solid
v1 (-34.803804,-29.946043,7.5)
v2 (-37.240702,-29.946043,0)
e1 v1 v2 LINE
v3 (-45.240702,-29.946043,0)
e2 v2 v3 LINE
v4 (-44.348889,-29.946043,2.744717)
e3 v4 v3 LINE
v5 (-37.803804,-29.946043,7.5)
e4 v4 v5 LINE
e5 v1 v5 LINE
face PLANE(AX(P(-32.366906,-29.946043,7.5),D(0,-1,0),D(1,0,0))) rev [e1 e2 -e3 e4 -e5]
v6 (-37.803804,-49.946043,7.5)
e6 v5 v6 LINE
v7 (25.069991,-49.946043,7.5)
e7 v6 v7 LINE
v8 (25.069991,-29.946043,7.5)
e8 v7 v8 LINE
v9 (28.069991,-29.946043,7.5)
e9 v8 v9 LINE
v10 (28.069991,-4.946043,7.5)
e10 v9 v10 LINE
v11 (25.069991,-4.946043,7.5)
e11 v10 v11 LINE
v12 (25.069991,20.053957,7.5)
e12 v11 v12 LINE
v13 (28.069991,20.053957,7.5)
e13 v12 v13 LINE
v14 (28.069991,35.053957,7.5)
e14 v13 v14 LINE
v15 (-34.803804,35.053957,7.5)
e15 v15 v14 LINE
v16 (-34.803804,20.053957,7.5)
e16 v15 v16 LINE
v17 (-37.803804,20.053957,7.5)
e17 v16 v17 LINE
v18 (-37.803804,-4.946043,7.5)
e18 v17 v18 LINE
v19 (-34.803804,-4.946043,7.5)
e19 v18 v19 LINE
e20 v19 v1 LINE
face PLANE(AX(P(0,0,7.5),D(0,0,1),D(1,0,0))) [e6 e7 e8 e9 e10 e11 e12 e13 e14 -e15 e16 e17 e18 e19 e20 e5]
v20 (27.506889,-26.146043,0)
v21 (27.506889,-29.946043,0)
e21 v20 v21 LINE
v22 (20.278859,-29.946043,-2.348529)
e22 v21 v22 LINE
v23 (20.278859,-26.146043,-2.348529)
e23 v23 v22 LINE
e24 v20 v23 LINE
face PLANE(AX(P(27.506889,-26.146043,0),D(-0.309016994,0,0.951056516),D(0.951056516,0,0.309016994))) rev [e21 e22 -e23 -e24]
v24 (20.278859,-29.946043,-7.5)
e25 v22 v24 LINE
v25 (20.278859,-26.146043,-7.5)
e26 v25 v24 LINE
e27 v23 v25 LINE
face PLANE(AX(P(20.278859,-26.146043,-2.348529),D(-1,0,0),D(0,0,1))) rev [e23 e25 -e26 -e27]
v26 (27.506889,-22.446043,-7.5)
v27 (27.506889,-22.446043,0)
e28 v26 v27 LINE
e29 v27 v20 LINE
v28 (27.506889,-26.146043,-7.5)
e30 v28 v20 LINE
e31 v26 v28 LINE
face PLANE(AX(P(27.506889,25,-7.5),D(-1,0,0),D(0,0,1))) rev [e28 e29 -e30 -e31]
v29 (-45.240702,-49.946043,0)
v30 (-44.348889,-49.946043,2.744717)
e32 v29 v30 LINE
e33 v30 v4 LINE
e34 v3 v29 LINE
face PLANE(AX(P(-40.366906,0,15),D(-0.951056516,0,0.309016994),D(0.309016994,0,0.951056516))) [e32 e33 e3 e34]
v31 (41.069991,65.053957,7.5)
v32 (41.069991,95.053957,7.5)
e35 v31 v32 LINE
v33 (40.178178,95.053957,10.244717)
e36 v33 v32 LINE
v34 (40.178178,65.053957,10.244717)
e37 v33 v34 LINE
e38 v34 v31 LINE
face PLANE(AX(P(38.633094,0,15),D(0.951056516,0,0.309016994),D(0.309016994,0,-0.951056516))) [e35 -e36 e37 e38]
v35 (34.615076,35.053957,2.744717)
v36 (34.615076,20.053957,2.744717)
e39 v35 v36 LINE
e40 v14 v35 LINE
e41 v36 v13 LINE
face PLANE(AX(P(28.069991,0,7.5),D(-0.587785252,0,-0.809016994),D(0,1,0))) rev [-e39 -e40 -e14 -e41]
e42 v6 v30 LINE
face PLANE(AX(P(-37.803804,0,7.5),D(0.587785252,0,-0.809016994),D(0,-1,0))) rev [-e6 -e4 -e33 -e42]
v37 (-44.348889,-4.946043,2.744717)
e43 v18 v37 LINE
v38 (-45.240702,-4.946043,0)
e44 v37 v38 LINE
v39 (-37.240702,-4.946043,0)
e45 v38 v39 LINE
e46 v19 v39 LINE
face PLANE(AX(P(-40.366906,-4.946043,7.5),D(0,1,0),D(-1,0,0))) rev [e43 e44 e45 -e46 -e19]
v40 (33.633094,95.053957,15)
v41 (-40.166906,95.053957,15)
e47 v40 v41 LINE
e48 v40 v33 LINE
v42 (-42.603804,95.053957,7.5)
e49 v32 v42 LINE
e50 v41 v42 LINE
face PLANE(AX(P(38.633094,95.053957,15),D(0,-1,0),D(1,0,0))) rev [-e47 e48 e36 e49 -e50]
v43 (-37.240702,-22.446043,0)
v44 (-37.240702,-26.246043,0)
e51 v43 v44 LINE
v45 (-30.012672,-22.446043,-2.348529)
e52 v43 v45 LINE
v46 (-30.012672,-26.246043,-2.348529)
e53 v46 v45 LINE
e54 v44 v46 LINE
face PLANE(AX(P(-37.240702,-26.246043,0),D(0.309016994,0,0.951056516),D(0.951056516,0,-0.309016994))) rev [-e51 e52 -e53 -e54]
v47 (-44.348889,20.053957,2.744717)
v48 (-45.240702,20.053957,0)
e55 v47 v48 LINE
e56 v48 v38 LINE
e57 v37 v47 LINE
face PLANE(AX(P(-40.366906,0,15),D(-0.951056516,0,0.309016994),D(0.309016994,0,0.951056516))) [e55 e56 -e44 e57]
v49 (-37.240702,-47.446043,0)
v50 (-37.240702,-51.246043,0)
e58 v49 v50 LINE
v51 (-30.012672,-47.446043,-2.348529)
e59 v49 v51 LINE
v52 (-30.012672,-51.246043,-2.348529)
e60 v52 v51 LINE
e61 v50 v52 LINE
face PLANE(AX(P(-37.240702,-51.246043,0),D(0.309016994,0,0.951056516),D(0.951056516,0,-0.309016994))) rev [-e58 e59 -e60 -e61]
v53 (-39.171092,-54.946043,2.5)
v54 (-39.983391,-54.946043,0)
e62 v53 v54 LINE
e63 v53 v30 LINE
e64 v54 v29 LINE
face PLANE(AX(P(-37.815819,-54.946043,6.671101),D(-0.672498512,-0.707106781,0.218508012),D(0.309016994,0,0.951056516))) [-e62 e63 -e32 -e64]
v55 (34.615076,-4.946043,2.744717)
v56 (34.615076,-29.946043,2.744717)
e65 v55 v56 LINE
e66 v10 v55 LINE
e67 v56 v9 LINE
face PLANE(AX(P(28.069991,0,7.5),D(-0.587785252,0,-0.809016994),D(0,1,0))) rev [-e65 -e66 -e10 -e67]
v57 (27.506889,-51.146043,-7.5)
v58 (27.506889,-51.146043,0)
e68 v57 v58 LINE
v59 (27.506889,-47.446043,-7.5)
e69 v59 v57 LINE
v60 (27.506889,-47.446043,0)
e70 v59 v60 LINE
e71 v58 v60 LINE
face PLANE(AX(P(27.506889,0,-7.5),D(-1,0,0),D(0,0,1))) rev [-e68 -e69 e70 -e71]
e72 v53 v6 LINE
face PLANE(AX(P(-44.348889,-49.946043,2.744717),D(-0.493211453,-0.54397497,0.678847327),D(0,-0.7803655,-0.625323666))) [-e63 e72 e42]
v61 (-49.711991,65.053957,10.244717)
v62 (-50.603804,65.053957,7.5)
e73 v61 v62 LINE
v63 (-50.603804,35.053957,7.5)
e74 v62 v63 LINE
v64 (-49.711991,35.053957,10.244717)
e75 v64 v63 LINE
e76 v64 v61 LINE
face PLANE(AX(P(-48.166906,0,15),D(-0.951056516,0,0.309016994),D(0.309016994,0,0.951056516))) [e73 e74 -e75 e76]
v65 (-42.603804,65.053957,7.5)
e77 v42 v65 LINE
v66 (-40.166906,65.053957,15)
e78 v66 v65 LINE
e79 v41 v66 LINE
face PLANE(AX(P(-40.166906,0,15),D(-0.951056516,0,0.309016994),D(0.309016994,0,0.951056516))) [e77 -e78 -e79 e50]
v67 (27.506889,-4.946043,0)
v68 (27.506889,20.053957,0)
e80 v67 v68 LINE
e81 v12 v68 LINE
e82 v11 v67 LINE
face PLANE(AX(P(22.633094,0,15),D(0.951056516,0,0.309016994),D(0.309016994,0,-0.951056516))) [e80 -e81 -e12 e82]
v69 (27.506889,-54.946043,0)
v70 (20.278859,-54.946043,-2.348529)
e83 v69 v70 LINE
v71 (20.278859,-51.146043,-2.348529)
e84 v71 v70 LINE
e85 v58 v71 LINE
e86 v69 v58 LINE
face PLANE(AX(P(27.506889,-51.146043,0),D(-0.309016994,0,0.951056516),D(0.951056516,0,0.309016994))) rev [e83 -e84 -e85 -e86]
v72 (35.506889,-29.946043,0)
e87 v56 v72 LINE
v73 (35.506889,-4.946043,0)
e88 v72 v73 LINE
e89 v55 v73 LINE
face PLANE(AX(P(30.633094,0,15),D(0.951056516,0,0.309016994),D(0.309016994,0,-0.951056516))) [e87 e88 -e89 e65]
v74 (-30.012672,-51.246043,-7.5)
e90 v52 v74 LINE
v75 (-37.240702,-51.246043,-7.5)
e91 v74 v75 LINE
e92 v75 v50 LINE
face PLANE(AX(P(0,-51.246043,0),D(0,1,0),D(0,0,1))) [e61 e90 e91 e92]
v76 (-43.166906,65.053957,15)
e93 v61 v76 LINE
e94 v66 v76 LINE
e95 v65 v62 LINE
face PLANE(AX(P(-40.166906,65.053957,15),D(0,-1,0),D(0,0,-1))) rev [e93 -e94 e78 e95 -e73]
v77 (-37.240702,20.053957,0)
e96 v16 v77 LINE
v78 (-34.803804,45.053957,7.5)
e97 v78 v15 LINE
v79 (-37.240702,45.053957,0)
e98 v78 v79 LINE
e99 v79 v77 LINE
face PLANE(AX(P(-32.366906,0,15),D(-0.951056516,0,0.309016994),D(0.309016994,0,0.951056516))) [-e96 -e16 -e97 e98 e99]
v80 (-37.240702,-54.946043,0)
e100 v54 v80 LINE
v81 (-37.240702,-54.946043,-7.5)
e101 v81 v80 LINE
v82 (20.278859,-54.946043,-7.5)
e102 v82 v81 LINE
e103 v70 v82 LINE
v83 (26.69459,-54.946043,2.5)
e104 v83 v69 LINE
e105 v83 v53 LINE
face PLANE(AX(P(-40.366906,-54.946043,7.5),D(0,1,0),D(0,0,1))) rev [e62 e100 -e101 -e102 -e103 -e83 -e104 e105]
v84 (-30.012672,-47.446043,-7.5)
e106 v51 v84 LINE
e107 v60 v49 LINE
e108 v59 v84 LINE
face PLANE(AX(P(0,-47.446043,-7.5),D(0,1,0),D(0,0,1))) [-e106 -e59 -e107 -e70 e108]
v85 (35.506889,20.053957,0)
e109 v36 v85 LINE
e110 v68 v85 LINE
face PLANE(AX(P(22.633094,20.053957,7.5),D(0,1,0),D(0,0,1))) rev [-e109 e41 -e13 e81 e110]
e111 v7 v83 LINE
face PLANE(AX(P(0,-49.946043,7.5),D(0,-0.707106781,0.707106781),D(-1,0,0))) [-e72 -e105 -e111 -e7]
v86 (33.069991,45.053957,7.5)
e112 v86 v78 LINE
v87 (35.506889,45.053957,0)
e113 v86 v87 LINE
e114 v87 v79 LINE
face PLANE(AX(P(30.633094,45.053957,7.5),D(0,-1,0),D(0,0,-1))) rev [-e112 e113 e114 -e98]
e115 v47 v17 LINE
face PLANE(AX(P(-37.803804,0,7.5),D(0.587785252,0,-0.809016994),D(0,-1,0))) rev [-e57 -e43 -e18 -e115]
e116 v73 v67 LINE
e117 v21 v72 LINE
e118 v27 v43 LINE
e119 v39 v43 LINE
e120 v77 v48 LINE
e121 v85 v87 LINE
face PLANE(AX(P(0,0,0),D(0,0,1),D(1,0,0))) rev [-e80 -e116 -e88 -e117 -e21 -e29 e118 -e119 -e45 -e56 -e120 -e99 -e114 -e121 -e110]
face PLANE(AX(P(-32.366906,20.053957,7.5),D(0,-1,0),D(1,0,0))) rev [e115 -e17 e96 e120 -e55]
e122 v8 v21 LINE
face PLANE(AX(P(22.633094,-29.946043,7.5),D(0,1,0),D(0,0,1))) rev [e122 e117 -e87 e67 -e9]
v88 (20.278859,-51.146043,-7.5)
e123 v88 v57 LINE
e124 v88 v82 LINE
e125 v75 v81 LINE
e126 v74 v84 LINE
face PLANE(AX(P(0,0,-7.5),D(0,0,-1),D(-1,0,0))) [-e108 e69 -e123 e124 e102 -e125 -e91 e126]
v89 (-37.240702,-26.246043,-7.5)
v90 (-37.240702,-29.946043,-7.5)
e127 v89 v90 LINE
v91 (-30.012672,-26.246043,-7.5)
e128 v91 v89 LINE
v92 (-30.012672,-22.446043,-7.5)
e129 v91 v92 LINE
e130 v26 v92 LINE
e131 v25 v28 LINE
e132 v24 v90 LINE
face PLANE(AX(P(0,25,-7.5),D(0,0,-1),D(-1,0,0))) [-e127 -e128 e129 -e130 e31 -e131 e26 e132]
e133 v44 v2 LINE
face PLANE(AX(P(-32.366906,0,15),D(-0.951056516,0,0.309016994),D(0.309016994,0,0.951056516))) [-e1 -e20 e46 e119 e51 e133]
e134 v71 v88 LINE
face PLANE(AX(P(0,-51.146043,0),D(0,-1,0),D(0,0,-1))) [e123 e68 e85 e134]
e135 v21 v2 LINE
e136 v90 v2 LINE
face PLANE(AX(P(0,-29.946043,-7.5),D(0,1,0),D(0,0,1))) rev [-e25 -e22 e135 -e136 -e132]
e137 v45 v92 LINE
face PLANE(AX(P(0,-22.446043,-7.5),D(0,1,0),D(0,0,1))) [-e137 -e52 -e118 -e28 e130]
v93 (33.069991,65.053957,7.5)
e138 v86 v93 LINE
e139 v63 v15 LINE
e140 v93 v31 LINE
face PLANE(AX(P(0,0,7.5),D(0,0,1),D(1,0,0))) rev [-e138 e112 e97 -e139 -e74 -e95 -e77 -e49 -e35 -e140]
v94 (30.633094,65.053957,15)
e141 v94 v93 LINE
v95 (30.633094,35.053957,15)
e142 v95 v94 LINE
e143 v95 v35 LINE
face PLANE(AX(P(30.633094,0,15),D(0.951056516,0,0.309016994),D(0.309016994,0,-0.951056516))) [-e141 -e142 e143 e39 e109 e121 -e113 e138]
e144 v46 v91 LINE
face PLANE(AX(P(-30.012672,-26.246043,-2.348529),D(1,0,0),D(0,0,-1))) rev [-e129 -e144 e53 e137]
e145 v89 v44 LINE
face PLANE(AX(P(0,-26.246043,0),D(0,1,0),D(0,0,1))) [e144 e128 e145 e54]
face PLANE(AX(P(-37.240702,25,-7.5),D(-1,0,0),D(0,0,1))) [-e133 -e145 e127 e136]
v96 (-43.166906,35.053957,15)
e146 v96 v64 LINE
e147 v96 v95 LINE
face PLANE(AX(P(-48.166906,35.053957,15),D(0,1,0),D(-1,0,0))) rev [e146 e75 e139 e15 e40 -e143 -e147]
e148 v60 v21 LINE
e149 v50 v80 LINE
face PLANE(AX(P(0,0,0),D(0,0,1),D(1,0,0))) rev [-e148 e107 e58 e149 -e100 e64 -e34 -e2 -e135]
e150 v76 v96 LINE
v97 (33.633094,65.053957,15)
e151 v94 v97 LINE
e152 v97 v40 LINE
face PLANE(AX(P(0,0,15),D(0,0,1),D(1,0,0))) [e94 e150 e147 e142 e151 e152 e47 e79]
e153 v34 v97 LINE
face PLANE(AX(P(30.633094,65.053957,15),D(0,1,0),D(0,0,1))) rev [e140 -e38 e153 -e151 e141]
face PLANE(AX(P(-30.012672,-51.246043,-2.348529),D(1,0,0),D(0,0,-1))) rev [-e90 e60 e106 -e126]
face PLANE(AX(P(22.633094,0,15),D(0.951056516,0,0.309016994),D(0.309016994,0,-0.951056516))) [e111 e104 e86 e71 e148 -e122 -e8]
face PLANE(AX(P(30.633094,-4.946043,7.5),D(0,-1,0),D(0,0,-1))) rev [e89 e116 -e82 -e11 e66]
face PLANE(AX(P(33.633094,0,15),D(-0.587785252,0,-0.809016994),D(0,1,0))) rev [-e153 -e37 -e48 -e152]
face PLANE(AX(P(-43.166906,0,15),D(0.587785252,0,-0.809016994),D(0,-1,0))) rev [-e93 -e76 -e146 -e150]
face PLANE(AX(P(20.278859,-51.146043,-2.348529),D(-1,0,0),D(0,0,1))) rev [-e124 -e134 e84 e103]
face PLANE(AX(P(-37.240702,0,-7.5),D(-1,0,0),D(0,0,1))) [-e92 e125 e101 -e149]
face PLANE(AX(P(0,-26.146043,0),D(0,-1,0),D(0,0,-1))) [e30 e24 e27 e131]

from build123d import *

# Parameters (mm, degrees)
BOSS_EXTRUDE1_DEPTH = 7.5
BOSS_EXTRUDE2_DEPTH = 7.5
DRAFT2_START        = -54.946043165
DRAFT2_DEPTH        = 100
DRAFT2_2_DEPTH      = 25
DRAFT2_START_2      = -29.946043165
DRAFT2_3_DEPTH      = 25
DRAFT2_START_3      = -4.946043165
DRAFT2_4_DEPTH      = 25
DRAFT2_START_4      = 20.053956835
DRAFT2_5_DEPTH      = 25
DRAFT2_START_5      = 35.053956835
DRAFT2_6_DEPTH      = 30
DRAFT2_START_6      = 65.053956835
DRAFT2_7_DEPTH      = 30
SKETCH3_W           = 64.747590887
SKETCH3_H           = 7.5
BOSS_EXTRUDE3_DEPTH = 7.5
CUT_EXTRUDE1_DEPTH  = 3.8
CUT_EXTRUDE2_DEPTH  = 3.8
LPATTERN1_COUNT     = 2
LPATTERN1_PITCH     = 25


# Read off the part's stored shape, not the designer's step: Draft2
with BuildPart() as part:
    # Sketch1 → Boss-Extrude1 (new body)
    with BuildSketch(Plane.XY):
        Polygon((-40.366906475, -54.946043165), (22.633093525, -54.946043165), (22.633093525, -29.946043165), (30.633093525, -29.946043165), (30.633093525, -4.946043165), (22.633093525, -4.946043165), (22.633093525, 20.053956835), (30.633093525, 20.053956835), (30.633093525, 45.053956835), (-32.366906475, 45.053956835), (-32.366906475, 20.053956835), (-40.366906475, 20.053956835), (-40.366906475, -4.946043165), (-32.366906475, -4.946043165), (-32.366906475, -29.946043165), (-40.366906475, -29.946043165), align=None)
    extrude(amount=BOSS_EXTRUDE1_DEPTH)

    # Sketch2 → Boss-Extrude2 (add)
    with BuildSketch(Plane.XY.offset(7.5)):
        Polygon((-48.166906475, 35.053956835), (30.633093525, 35.053956835), (30.633093525, 65.053956835), (38.633093525, 65.053956835), (38.633093525, 95.053956835), (-40.166906475, 95.053956835), (-40.166906475, 65.053956835), (-48.166906475, 65.053956835), align=None)
    extrude(amount=BOSS_EXTRUDE2_DEPTH)

    # Draft2 outline → Draft2 (add)
    with BuildSketch(Plane(origin=(0, 0, 0), x_dir=(1, 0, 0), z_dir=(0, 1, 0)).offset(DRAFT2_START)):
        Polygon((-32.366906475, 0), (-37.240701918, 0), (-34.803804197, -7.5), (-32.366906475, -7.5), align=None)
        Polygon((27.506888969, 0), (22.633093525, 0), (22.633093525, -7.5), (25.069991247, -7.5), align=None)
    extrude(amount=DRAFT2_DEPTH)

    # Draft2 2 outline → Draft2 2 (add)
    with BuildSketch(Plane(origin=(0, 0, 0), x_dir=(1, 0, 0), z_dir=(0, 1, 0)).offset(DRAFT2_START)):
        Polygon((-40.366906475, 0), (-45.240701918, 0), (-42.803804197, -7.5), (-40.366906475, -7.5), align=None)
    extrude(amount=DRAFT2_2_DEPTH)

    # Draft2 3 outline → Draft2 3 (add)
    with BuildSketch(Plane(origin=(0, 0, 0), x_dir=(1, 0, 0), z_dir=(0, 1, 0)).offset(DRAFT2_START_2)):
        Polygon((35.506888969, 0), (30.633093525, 0), (30.633093525, -7.5), (33.069991247, -7.5), align=None)
    extrude(amount=DRAFT2_3_DEPTH)

    # Draft2 4 outline → Draft2 4 (add)
    with BuildSketch(Plane(origin=(0, 0, 0), x_dir=(1, 0, 0), z_dir=(0, 1, 0)).offset(DRAFT2_START_3)):
        Polygon((-40.366906475, 0), (-45.240701918, 0), (-42.803804197, -7.5), (-40.366906475, -7.5), align=None)
    extrude(amount=DRAFT2_4_DEPTH)

    # Draft2 5 outline → Draft2 5 (add)
    with BuildSketch(Plane(origin=(0, 0, 0), x_dir=(1, 0, 0), z_dir=(0, 1, 0)).offset(DRAFT2_START_4)):
        Polygon((35.506888969, 0), (30.633093525, 0), (30.633093525, -7.5), (33.069991247, -7.5), align=None)
    extrude(amount=DRAFT2_5_DEPTH)

    # Draft2 6 outline → Draft2 6 (add)
    with BuildSketch(Plane(origin=(0, 0, 0), x_dir=(1, 0, 0), z_dir=(0, 1, 0)).offset(DRAFT2_START_5)):
        Polygon((-48.166906475, -15), (-48.166906475, -7.5), (-50.603804197, -7.5), align=None)
        Polygon((33.069991247, -7.5), (30.633093525, -7.5), (30.633093525, -15), align=None)
    extrude(amount=DRAFT2_6_DEPTH)

    # Draft2 7 outline → Draft2 7 (add)
    with BuildSketch(Plane(origin=(0, 0, 0), x_dir=(1, 0, 0), z_dir=(0, 1, 0)).offset(DRAFT2_START_6)):
        Polygon((41.069991247, -7.5), (38.633093525, -7.5), (38.633093525, -15), align=None)
        Polygon((-40.166906475, -7.5), (-42.603804197, -7.5), (-40.166906475, -15), align=None)
    extrude(amount=DRAFT2_7_DEPTH)

    # Sketch3 → Boss-Extrude3 (add)
    with BuildSketch(Plane(origin=(0, 0, 0), x_dir=(-1, 0, 0), z_dir=(0, 0, -1))):
        with Locations((4.866906474, -51.196043165)):
            Rectangle(SKETCH3_W, SKETCH3_H)
    boss_extrude3 = extrude(amount=BOSS_EXTRUDE3_DEPTH)

    # Sketch4 → Cut-Extrude1 (cut)
    with BuildSketch(Plane.XZ.offset(54.946043165)):
        Polygon((27.506888969, -7.5), (27.506888969, 0), (20.278859445, -2.348529157), (20.278859445, -7.5), align=None)
    cut_extrude1 = extrude(amount=-CUT_EXTRUDE1_DEPTH, mode=Mode.SUBTRACT)

    # Sketch5 → Cut-Extrude2 (cut)
    with BuildSketch(Plane(origin=(0, -47.446043165, 0), x_dir=(1, 0, 0), z_dir=(0, 1, 0))):
        Polygon((-37.240701918, 7.5), (-37.240701918, 0), (-30.012672394, 2.348529157), (-30.012672394, 7.5), align=None)
    cut_extrude2 = extrude(amount=-CUT_EXTRUDE2_DEPTH, mode=Mode.SUBTRACT)

    # LPattern1: Boss-Extrude3, Cut-Extrude1, Cut-Extrude2 ×2
    with Locations(*[(0, i * LPATTERN1_PITCH, 0) for i in range(1, LPATTERN1_COUNT)]):
        add(boss_extrude3)
        add(cut_extrude1, mode=Mode.SUBTRACT)
        add(cut_extrude2, mode=Mode.SUBTRACT)

    # Chamfer2
    # the kernel refuses this chamfer: 5 mm, written as the material it takes off along each edge
    with BuildSketch(Plane(origin=(-40.441261641, -51.612709832, 4.248239139), x_dir=(-0.7189342036162105, 0.6942471081166146, 0.033978872000742164), z_dir=(-0.4932114534551065, -0.5439749702030539, 0.6788473274406317))) as chamfer2_piece_1:
        Polygon((-3.286728939, 2.231187156), (3.915317626, 2.231187156), (-0.628588687, -4.462374312), align=None)
    extrude(amount=5.70452533, mode=Mode.SUBTRACT)
    with BuildSketch(Plane(origin=(33.069991247, -42.853897845, 7.5), x_dir=(-0.9997407638607628, 0, 0.022768510603425433), z_dir=(0, 1, 0))) as chamfer2_piece_2:
        with BuildLine():
            Line((5.163141872, 0), (-1.817393185, -4.83271311))
            Line((-1.817393185, -4.83271311), (-1.911770596, -4.799654007))
            ThreePointArc((-1.911770596, -4.799654007), (-0.947600353, -2.402729105), (-0.094377411, 0.033059103))
            Line((-0.094377411, 0.033059103), (0.002276851, 0.099974076))
            ThreePointArc((0.002276851, 0.099974076), (2.582509488, 0.041210789), (5.165418723, 0.099974076))
            Line((5.165418723, 0.099974076), (5.163141872, 0))
        make_face()
    extrude(amount=50.815709359, mode=Mode.SUBTRACT)
    with BuildSketch(Plane(origin=(-49.214170654, -54.946043165, -12.229079318), x_dir=(0.9506969379377622, -0.027495876610586285, -0.30890016018962835), z_dir=(0.309016994289291, 0, 0.951056516322985))) as chamfer2_piece_3:
        with BuildLine():
            Line((5.143365976, 0), (-0.282735774, 5.135588968))
            Line((-0.282735774, 5.135588968), (-0.382697966, 5.13283938))
            ThreePointArc((-0.382697966, 5.13283938), (-0.170646135, 2.566989148), (-0.099962192, -0.002749588))
            Line((-0.099962192, -0.002749588), (0.002749588, -0.099962192))
            ThreePointArc((0.002749588, -0.099962192), (2.572488324, -0.029278248), (5.146115564, -0.099962192))
            Line((5.146115564, -0.099962192), (5.143365976, 0))
        make_face()
    extrude(amount=33.602796561, mode=Mode.SUBTRACT)
    with BuildSketch(Plane(origin=(33.069991247, 7.146102155, 7.5), x_dir=(-0.9997407638607628, 0, 0.022768510603425433), z_dir=(0, 1, 0))) as chamfer2_piece_4:
        with BuildLine():
            Line((5.163141872, 0), (-1.817393185, -4.83271311))
            Line((-1.817393185, -4.83271311), (-1.911770596, -4.799654007))
            ThreePointArc((-1.911770596, -4.799654007), (-0.947600353, -2.402729105), (-0.094377411, 0.033059103))
            Line((-0.094377411, 0.033059103), (0.002276851, 0.099974076))
            ThreePointArc((0.002276851, 0.099974076), (2.582509488, 0.041210789), (5.165418723, 0.099974076))
            Line((5.165418723, 0.099974076), (5.163141872, 0))
        make_face()
    extrude(amount=27.90785468, mode=Mode.SUBTRACT)
    with BuildSketch(Plane(origin=(-42.803804197, -67.853897845, 7.5), x_dir=(0.9997407638607191, 0, 0.022768510605345404), z_dir=(0, 1, 0)), Plane(origin=(-42.803804197, -17.853897845, 7.5), x_dir=(0.9997407638607191, 0, 0.022768510605345404), z_dir=(0, 1, 0))) as chamfer2_piece_5:
        with BuildLine():
            Line((5.163141872, 0), (-1.817393184, 4.83271311))
            Line((-1.817393184, 4.83271311), (-1.911770595, 4.799654007))
            ThreePointArc((-1.911770595, 4.799654007), (-0.947600353, 2.402729105), (-0.094377411, -0.033059103))
            Line((-0.094377411, -0.033059103), (0.002276851, -0.099974076))
            ThreePointArc((0.002276851, -0.099974076), (2.582509488, -0.041210789), (5.165418723, -0.099974076))
            Line((5.165418723, -0.099974076), (5.163141872, 0))
        make_face()
    extrude(amount=50.815709359, mode=Mode.SUBTRACT)
    with BuildSketch(Plane(origin=(-48.166906475, 77.961811514, 15), x_dir=(0.9997407638607629, 0, 0.022768510603425628), z_dir=(0, -1, 0)), Plane(origin=(38.633093525, 52.146102155, 15), x_dir=(-0.9997407638607629, 0, 0.022768510603425628), z_dir=(0, 1, 0))) as chamfer2_piece_6:
        with BuildLine():
            Line((5.163141872, 0), (-1.817393185, -4.83271311))
            Line((-1.817393185, -4.83271311), (-1.911770596, -4.799654007))
            ThreePointArc((-1.911770596, -4.799654007), (-0.947600353, -2.402729105), (-0.094377411, 0.033059103))
            Line((-0.094377411, 0.033059103), (0.002276851, 0.099974076))
            ThreePointArc((0.002276851, 0.099974076), (2.582509488, 0.041210789), (5.165418723, 0.099974076))
            Line((5.165418723, 0.099974076), (5.163141872, 0))
        make_face()
    extrude(amount=55.815709359, mode=Mode.SUBTRACT)
    with BuildSketch(Plane(origin=(-32.366906475, -54.946043165, 7.5), x_dir=(0, -0.027495876610586317, -0.9996219169112968), z_dir=(1, 0, 0))) as chamfer2_piece_7:
        with BuildLine():
            Line((5.143365976, 0), (-0.282735774, 5.135588968))
            Line((-0.282735774, 5.135588968), (-0.382697966, 5.13283938))
            ThreePointArc((-0.382697966, 5.13283938), (-0.170646135, 2.566989148), (-0.099962192, -0.002749588))
            Line((-0.099962192, -0.002749588), (0.002749588, -0.099962192))
            ThreePointArc((0.002749588, -0.099962192), (2.572488324, -0.029278248), (5.146115564, -0.099962192))
            Line((5.146115564, -0.099962192), (5.143365976, 0))
        make_face()
    extrude(amount=55, mode=Mode.SUBTRACT)
    with BuildSketch(Plane(origin=(-34.803804197, -54.946043165, 7.5), x_dir=(0, -0.02749587670275982, -0.9996219169087613), z_dir=(1, 0, 0))) as chamfer2_piece_8:
        with BuildLine():
            Line((5.143365976, 0), (-0.282735775, 5.135588968))
            Line((-0.282735775, 5.135588968), (-0.382697967, 5.13283938))
            ThreePointArc((-0.382697967, 5.13283938), (-0.170646136, 2.566989148), (-0.099962192, -0.002749588))
            Line((-0.099962192, -0.002749588), (0.002749588, -0.099962192))
            ThreePointArc((0.002749588, -0.099962192), (2.572488324, -0.029278248), (5.146115564, -0.099962192))
            Line((5.146115564, -0.099962192), (5.143365976, 0))
        make_face()
    extrude(amount=2.436897722, mode=Mode.SUBTRACT)
    with BuildSketch(Plane(origin=(22.633093525, -54.946043165, 7.5), x_dir=(0, -0.02749587670275982, -0.9996219169087613), z_dir=(1, 0, 0))) as chamfer2_piece_9:
        with BuildLine():
            Line((5.143365976, 0), (-0.282735775, 5.135588968))
            Line((-0.282735775, 5.135588968), (-0.382697967, 5.13283938))
            ThreePointArc((-0.382697967, 5.13283938), (-0.170646136, 2.566989148), (-0.099962192, -0.002749588))
            Line((-0.099962192, -0.002749588), (0.002749588, -0.099962192))
            ThreePointArc((0.002749588, -0.099962192), (2.572488324, -0.029278248), (5.146115564, -0.099962192))
            Line((5.146115564, -0.099962192), (5.143365976, 0))
        make_face()
    extrude(amount=15.295312662, mode=Mode.SUBTRACT)
    with BuildSketch(Plane(origin=(-40.366906475, -54.946043165, 7.5), x_dir=(0, -0.027495876610586317, -0.9996219169112968), z_dir=(1, 0, 0))) as chamfer2_piece_10:
        with BuildLine():
            Line((5.143365976, 0), (-0.282735774, 5.135588968))
            Line((-0.282735774, 5.135588968), (-0.382697966, 5.13283938))
            ThreePointArc((-0.382697966, 5.13283938), (-0.170646135, 2.566989148), (-0.099962192, -0.002749588))
            Line((-0.099962192, -0.002749588), (0.002749588, -0.099962192))
            ThreePointArc((0.002749588, -0.099962192), (2.572488324, -0.029278248), (5.146115564, -0.099962192))
            Line((5.146115564, -0.099962192), (5.143365976, 0))
        make_face()
    extrude(amount=5.563102278, mode=Mode.SUBTRACT)
    with BuildSketch(Plane(origin=(-55.662219137, -54.946043165, 7.5), x_dir=(0, -0.027495876610586317, -0.9996219169112968), z_dir=(1, 0, 0))) as chamfer2_piece_11:
        with BuildLine():
            Line((5.143365976, 0), (-0.282735774, 5.135588968))
            Line((-0.282735774, 5.135588968), (-0.382697966, 5.13283938))
            ThreePointArc((-0.382697966, 5.13283938), (-0.170646135, 2.566989148), (-0.099962192, -0.002749588))
            Line((-0.099962192, -0.002749588), (0.002749588, -0.099962192))
            ThreePointArc((0.002749588, -0.099962192), (2.572488324, -0.029278248), (5.146115564, -0.099962192))
            Line((5.146115564, -0.099962192), (5.143365976, 0))
        make_face()
    extrude(amount=15.295312662, mode=Mode.SUBTRACT)


solid = part.part
